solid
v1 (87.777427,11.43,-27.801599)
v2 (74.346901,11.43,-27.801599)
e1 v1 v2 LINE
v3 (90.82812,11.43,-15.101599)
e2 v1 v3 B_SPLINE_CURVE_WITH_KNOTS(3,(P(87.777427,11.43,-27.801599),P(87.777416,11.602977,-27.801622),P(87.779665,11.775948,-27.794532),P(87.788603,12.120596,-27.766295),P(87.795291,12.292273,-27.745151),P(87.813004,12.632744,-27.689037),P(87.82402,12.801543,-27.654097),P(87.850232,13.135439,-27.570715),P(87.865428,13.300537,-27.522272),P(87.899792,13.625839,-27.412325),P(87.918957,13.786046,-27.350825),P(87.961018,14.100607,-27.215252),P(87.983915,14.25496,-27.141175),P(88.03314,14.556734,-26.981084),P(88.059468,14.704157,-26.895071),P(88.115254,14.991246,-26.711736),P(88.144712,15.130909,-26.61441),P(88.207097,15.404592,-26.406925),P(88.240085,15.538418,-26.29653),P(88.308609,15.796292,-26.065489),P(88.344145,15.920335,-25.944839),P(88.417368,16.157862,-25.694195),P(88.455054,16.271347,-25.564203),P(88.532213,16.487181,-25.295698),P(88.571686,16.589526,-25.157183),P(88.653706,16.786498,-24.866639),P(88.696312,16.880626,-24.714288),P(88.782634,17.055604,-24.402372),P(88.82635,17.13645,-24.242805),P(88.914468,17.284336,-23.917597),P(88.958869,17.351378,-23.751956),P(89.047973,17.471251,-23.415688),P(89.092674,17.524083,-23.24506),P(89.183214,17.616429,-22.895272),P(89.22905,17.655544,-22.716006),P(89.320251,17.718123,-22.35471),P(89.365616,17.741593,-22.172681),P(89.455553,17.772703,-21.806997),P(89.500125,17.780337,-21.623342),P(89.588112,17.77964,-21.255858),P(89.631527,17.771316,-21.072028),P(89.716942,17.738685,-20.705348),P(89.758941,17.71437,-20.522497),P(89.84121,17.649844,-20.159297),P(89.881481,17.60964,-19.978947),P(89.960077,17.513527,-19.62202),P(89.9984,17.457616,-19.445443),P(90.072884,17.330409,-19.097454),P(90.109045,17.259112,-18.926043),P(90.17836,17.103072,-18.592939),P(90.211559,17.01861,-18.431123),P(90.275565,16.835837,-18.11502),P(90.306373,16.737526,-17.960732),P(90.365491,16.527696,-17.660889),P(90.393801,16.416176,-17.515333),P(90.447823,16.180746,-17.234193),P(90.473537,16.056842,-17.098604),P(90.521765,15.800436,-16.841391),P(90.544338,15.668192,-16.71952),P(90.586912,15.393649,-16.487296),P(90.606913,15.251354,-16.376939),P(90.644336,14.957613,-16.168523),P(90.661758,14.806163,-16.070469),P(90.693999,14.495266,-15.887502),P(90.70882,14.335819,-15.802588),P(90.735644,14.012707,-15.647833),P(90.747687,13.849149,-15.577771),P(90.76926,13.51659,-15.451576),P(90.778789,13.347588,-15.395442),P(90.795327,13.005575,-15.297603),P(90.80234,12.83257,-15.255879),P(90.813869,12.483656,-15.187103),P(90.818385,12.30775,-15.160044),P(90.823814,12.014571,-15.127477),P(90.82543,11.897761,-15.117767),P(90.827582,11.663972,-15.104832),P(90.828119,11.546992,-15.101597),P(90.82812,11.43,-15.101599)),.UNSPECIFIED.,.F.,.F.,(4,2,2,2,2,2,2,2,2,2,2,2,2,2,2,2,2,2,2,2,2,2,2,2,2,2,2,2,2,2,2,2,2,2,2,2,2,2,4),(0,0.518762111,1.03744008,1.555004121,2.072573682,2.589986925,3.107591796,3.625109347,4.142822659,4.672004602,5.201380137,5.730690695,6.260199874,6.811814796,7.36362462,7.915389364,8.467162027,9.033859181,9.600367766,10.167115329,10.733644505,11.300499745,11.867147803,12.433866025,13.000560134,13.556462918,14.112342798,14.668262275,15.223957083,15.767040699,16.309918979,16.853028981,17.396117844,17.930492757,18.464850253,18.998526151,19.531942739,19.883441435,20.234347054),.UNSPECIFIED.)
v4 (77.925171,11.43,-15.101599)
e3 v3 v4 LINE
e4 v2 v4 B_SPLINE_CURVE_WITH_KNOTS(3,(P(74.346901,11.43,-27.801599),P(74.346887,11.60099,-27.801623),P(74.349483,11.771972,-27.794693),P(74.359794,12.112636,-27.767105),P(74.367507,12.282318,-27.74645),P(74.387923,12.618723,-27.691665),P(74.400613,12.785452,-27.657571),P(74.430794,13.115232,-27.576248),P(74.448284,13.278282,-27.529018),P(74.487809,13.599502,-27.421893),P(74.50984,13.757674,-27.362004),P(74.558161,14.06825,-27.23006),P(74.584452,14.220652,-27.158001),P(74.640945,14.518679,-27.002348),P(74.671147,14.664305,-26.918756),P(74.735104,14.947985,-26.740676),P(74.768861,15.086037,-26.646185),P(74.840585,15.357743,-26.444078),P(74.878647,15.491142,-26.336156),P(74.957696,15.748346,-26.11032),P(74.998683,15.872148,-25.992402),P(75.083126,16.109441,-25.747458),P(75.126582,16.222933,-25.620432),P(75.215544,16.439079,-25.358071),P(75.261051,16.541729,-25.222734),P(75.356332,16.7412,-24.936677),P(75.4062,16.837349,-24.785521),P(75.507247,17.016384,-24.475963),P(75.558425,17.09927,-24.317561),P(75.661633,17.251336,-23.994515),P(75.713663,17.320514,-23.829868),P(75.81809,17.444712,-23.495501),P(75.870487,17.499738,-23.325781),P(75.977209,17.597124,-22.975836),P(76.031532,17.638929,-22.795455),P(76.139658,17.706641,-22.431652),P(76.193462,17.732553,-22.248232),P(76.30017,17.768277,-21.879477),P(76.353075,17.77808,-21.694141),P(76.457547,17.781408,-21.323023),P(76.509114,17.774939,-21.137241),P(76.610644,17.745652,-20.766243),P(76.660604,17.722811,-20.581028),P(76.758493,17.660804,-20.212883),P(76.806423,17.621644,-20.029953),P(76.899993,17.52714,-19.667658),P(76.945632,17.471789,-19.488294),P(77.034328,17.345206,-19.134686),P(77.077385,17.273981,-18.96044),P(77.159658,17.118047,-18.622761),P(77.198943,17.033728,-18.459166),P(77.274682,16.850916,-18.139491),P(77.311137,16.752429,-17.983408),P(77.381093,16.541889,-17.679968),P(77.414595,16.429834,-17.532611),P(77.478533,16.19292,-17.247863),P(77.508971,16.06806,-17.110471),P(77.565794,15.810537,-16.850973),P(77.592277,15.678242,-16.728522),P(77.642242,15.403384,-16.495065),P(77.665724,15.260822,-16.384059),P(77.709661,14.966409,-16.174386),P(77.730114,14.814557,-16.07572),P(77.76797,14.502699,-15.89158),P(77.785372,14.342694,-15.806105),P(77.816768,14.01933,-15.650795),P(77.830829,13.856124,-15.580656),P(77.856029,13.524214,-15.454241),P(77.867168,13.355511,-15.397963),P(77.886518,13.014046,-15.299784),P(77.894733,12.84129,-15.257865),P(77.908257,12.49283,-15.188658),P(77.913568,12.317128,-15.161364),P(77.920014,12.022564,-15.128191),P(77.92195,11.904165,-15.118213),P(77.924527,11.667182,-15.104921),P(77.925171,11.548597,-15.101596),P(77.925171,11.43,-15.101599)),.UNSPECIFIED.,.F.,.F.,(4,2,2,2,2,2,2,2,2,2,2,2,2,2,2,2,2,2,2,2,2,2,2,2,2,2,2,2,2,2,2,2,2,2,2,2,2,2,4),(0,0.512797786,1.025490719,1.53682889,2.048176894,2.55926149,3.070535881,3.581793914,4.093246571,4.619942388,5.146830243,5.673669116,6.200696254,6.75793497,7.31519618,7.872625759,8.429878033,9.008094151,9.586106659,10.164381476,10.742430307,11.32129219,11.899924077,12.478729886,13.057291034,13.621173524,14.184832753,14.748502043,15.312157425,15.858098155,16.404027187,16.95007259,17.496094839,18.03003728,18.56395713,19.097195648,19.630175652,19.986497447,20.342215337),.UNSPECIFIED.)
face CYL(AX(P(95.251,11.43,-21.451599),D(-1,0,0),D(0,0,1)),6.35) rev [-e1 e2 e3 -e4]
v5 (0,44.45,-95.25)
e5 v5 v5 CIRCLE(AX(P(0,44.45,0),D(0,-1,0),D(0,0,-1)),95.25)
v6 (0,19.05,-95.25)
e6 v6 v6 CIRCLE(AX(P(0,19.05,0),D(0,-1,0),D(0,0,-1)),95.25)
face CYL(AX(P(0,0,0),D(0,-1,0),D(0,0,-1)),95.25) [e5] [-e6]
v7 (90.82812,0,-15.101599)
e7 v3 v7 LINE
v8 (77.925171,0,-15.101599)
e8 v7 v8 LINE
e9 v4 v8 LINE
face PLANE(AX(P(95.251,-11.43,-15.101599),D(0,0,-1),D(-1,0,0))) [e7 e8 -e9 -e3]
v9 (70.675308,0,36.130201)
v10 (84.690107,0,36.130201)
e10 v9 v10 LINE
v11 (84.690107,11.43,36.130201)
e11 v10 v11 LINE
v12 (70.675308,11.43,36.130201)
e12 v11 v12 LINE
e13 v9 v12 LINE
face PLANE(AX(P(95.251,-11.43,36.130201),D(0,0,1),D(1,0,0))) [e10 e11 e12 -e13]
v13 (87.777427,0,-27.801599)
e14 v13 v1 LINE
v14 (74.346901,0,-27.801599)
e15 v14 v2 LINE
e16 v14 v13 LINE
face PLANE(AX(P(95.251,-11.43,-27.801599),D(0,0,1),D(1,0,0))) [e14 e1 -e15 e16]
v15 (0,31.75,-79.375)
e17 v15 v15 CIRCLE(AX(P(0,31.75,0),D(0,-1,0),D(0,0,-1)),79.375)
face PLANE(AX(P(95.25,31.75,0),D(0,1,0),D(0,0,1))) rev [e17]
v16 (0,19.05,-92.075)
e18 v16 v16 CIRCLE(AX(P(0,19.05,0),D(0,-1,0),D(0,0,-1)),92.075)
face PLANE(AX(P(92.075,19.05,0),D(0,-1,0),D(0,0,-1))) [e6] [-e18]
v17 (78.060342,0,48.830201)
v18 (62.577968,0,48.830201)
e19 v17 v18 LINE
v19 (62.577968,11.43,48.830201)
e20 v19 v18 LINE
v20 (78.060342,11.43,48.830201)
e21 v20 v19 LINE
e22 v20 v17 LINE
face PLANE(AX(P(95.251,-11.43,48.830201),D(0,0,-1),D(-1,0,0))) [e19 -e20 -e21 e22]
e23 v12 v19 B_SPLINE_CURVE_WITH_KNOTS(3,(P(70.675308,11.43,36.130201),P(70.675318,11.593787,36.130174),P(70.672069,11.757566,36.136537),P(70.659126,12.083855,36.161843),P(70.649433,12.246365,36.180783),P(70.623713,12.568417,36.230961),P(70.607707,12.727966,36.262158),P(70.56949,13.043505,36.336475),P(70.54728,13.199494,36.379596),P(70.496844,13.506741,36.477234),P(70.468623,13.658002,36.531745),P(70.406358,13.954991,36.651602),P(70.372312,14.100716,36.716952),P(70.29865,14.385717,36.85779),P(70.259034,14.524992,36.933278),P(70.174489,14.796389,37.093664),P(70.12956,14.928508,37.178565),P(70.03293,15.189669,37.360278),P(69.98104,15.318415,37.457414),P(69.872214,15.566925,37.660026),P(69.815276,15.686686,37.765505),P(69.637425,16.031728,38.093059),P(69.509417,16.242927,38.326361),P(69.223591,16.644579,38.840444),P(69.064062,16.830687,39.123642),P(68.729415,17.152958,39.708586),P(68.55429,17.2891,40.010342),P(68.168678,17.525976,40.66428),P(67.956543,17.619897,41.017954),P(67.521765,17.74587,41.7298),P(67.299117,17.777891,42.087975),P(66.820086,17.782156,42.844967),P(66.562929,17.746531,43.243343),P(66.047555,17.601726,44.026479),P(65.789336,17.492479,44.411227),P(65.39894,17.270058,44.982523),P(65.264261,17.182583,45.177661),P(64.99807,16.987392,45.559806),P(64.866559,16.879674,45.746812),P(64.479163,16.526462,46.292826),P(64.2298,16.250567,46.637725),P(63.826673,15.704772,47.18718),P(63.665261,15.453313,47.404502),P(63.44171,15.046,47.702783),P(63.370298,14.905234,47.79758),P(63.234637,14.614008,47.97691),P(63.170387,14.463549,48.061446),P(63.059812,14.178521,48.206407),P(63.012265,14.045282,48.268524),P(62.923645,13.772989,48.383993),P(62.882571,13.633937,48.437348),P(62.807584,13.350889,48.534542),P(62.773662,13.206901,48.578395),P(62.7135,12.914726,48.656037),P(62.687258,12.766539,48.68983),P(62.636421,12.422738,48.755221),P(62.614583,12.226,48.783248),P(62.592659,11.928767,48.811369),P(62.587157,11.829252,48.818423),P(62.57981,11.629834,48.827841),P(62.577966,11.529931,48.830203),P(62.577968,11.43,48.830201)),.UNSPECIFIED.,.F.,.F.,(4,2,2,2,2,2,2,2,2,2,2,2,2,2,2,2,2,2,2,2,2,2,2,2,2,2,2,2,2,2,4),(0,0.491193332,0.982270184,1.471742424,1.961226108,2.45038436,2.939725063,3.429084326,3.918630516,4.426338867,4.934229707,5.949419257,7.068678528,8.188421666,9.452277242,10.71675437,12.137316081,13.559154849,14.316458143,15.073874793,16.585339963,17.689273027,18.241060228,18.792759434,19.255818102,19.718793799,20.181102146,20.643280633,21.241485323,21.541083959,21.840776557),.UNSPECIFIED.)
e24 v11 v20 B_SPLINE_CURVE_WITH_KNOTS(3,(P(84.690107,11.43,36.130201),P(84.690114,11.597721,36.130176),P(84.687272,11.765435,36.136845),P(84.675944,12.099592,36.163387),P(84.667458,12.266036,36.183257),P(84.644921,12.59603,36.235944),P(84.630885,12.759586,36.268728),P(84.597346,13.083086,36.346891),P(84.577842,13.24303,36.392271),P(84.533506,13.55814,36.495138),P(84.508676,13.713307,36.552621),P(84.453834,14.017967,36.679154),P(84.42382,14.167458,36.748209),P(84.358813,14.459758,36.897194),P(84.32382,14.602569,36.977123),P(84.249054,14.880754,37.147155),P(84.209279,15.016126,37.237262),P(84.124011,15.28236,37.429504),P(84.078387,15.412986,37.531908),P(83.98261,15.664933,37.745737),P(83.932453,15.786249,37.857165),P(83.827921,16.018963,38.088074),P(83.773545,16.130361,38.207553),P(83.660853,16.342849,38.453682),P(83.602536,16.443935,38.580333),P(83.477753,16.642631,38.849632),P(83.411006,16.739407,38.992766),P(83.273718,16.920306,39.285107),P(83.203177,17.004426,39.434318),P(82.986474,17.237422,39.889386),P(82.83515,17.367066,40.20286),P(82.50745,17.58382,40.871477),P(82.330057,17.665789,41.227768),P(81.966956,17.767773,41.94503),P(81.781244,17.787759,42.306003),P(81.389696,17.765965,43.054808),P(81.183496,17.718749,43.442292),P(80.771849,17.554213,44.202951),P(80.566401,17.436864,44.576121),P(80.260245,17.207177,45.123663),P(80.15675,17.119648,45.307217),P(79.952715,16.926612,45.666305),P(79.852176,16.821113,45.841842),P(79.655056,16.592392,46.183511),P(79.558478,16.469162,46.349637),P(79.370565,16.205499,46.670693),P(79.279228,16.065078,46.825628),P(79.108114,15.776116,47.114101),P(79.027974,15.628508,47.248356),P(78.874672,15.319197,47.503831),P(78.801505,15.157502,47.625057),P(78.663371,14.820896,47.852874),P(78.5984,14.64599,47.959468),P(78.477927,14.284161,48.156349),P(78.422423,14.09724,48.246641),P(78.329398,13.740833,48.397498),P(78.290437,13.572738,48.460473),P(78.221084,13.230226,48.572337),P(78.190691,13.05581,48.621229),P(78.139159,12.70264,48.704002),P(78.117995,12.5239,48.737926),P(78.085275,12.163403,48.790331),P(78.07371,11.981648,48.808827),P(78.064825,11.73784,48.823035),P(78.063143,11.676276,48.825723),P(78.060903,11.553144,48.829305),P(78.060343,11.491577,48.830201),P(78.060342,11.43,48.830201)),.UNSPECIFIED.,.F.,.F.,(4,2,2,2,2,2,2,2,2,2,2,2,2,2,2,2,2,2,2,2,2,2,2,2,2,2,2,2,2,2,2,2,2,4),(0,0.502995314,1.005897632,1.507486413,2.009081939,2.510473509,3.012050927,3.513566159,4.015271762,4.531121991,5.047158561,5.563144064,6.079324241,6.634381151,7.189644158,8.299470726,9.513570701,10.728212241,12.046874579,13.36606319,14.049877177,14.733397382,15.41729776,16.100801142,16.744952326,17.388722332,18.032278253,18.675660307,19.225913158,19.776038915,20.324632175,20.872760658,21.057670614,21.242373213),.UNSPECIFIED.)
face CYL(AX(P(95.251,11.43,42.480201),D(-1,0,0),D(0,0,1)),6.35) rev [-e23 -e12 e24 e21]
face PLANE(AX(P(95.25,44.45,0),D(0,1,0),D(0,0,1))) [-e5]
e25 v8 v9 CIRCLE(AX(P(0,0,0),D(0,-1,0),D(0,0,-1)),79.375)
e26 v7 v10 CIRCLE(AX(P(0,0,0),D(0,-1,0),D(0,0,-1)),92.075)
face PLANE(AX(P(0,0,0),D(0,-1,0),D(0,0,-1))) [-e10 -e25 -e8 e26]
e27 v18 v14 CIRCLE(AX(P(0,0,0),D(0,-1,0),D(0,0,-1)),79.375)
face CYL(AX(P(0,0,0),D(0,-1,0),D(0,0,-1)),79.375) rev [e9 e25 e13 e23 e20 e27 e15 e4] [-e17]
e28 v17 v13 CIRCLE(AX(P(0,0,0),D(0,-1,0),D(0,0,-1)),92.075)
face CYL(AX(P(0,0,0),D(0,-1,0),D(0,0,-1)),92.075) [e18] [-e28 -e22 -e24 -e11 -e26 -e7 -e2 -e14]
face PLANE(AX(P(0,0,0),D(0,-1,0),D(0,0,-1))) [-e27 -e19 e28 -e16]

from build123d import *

# Parameters (mm, degrees)
SHELL1_OUTLINE_R        = 79.375
SHELL1_DEPTH            = 31.75
CUT_EXTRUDE2_REACH      = 143.848
CUT_EXTRUDE2_END_RADIUS = 92.075


# Read off the part's stored shape, not the designer's step: Shell1
with BuildPart() as part:
    # Sketch1 → Revolve1 (revolve)
    with BuildSketch(Plane.XY, mode=Mode.PRIVATE) as revolve1_sk:
        Polygon((0, 0), (92.075, 0), (92.075, 19.05), (95.25, 19.05), (95.25, 44.45), (0, 44.45), align=None)
    revolve(revolve1_sk.sketch.rotate(Axis((0, 0, 0), (0, 1, 0)), 90), axis=Axis((0, 0, 0), (0, 1, 0)))

    # Shell1 outline → Shell1 (cut)
    with BuildSketch(Plane(origin=(0, 0, 0), x_dir=(1, 0, 0), z_dir=(0, 1, 0))):
        Circle(SHELL1_OUTLINE_R)
    extrude(amount=SHELL1_DEPTH, mode=Mode.SUBTRACT)

    # Cut-Extrude2: up to this cylinder (the profile starts inside it)
    cut_extrude2_end = Plane(origin=(0, 0, 0), z_dir=(0, -1, 0)) * Cylinder(CUT_EXTRUDE2_END_RADIUS, 472.846, mode=Mode.PRIVATE)
    # Sketch2 → Cut-Extrude2 (cut, up to the surface)
    with BuildSketch(Plane(origin=(0, 0, 0), x_dir=(0, 0, -1), z_dir=(1, 0, 0)), mode=Mode.PRIVATE) as cut_extrude2_sk1:
        with BuildLine():
            Line((-48.830201285, -11.43), (-48.830201285, 11.43))
            ThreePointArc((-48.830201285, 11.43), (-42.480201285, 17.78), (-36.130201285, 11.43))
            Line((-36.130201285, 11.43), (-36.130201285, -11.43))
            ThreePointArc((-36.130201285, -11.43), (-42.480201285, -17.78), (-48.830201285, -11.43))
        make_face()
    cut_extrude2_tool1 = extrude(cut_extrude2_sk1.sketch, amount=CUT_EXTRUDE2_REACH, mode=Mode.PRIVATE) & cut_extrude2_end
    add(cut_extrude2_tool1.solids().sort_by_distance((0, 0, 42.480201))[0], mode=Mode.SUBTRACT)
    # Sketch2 → Cut-Extrude2 (cut, up to the surface)
    with BuildSketch(Plane(origin=(0, 0, 0), x_dir=(0, 0, -1), z_dir=(1, 0, 0)), mode=Mode.PRIVATE) as cut_extrude2_sk2:
        with BuildLine():
            Line((15.101598715, -11.43), (15.101598715, 11.43))
            ThreePointArc((15.101598715, 11.43), (21.451598715, 17.78), (27.801598715, 11.43))
            Line((27.801598715, 11.43), (27.801598715, -11.43))
            ThreePointArc((27.801598715, -11.43), (21.451598715, -17.78), (15.101598715, -11.43))
        make_face()
    cut_extrude2_tool2 = extrude(cut_extrude2_sk2.sketch, amount=CUT_EXTRUDE2_REACH, mode=Mode.PRIVATE) & cut_extrude2_end
    add(cut_extrude2_tool2.solids().sort_by_distance((0, 0, -21.451599))[0], mode=Mode.SUBTRACT)


solid = part.part
